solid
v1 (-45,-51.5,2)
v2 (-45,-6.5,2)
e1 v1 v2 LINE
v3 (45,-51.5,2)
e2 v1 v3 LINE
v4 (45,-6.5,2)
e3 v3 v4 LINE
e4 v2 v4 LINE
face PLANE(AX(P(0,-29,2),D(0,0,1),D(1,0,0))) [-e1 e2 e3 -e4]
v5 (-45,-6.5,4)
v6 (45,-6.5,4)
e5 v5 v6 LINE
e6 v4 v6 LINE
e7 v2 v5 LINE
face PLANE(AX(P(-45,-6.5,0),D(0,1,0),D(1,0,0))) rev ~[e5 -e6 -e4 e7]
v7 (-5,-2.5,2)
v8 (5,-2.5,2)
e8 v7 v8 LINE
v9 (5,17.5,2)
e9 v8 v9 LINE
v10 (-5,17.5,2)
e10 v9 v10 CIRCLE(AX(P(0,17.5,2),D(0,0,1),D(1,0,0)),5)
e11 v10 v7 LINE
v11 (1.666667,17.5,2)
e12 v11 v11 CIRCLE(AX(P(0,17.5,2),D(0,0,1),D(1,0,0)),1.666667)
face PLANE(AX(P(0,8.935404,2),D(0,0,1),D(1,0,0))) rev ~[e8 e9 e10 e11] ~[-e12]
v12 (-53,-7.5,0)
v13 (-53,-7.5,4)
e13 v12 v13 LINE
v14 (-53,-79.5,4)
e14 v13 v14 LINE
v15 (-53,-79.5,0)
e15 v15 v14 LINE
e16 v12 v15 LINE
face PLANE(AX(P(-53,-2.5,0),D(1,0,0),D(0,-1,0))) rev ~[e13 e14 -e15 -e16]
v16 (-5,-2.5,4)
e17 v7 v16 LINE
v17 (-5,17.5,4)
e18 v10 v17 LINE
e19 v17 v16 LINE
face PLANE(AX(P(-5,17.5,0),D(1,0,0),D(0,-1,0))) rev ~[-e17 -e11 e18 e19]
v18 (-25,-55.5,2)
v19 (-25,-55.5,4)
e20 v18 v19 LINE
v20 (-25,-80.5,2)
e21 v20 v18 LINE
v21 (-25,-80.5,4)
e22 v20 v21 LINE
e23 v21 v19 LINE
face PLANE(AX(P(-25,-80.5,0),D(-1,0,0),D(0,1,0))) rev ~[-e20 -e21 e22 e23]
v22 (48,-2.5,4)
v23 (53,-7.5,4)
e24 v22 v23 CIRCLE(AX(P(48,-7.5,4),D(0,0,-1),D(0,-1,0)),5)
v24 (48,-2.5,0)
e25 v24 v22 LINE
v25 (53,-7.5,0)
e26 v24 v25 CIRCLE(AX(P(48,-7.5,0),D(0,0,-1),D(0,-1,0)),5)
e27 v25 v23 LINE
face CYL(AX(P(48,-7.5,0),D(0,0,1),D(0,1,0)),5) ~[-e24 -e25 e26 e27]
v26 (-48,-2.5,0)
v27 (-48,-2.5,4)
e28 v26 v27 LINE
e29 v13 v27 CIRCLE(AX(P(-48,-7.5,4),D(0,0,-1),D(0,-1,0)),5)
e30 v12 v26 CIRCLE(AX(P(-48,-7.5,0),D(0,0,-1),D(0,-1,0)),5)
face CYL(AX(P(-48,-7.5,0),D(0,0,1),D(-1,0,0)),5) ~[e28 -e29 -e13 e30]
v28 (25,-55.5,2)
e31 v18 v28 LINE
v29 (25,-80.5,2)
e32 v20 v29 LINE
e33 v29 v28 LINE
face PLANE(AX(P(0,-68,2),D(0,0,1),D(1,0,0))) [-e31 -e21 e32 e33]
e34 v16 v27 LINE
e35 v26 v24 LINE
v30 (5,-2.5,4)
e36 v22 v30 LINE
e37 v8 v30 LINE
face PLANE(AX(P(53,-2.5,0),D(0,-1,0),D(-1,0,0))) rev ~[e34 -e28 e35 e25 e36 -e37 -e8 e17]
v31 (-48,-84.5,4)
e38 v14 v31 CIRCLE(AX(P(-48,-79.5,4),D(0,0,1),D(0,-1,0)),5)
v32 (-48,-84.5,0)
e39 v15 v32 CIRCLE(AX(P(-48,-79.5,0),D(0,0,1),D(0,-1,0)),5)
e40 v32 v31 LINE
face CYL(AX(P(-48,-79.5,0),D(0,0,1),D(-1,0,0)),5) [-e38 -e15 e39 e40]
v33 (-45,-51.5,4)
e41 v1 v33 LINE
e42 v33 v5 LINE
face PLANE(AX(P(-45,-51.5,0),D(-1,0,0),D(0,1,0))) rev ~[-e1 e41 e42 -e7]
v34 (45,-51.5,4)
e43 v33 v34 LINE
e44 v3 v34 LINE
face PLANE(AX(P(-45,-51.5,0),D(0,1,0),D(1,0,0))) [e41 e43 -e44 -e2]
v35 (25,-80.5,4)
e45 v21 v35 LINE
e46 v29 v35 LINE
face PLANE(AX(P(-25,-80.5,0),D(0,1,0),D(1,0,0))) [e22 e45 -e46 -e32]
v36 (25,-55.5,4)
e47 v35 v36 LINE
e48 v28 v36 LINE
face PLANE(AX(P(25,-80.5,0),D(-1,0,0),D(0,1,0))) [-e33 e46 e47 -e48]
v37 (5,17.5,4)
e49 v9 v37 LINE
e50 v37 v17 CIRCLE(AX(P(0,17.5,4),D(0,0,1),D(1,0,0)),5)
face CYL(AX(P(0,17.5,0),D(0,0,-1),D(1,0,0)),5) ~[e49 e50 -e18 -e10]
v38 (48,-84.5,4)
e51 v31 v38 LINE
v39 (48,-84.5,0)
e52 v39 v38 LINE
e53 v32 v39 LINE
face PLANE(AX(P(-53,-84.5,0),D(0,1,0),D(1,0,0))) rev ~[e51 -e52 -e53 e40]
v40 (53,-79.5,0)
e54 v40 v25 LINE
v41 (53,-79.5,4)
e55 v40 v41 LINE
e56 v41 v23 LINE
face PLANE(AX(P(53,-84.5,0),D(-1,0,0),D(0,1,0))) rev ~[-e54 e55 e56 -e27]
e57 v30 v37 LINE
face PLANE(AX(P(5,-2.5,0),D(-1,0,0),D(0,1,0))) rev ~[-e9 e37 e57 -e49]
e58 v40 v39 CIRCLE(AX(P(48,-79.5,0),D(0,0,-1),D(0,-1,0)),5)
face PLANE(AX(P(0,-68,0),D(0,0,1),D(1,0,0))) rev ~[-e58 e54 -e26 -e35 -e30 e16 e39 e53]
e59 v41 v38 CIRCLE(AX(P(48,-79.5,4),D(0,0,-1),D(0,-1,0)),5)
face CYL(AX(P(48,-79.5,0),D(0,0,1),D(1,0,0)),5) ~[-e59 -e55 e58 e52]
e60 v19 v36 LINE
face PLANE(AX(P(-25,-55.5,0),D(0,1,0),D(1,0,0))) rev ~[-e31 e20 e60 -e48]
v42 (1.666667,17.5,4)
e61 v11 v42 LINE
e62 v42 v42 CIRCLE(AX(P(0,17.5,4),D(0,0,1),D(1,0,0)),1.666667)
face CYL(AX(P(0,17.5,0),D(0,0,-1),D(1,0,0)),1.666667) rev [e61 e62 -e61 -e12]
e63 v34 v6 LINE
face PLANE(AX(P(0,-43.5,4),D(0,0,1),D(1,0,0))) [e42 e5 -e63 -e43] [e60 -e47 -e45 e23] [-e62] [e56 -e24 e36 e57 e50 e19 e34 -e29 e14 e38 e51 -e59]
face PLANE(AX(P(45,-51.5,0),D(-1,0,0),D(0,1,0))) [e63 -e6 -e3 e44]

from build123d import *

# Parameters (mm, degrees)
F0_W     = 50
F0_H     = 25
F0_W_2   = 90
F0_H_2   = 45
F1_DEPTH = 4
F2_DEPTH = 2
F5_DEPTH = 2.001
F7_R     = 5
F0_R     = 1.6666666667
F8_DEPTH = 4
F9_DEPTH = 2


# Not quite as in the source:
# - a feature names something its author has since deleted; it is built from what else it names


with BuildPart() as f1:
    # F0 (on Top) → F1 (new body)
    with BuildSketch(Plane.XY):
        Polygon((-53, -84.5), (53, -84.5), (53, -2.5), (5, -2.5), (-5, -2.5), (-53, -2.5), align=None)
        with Locations((0, -68)):
            Rectangle(F0_W, F0_H, mode=Mode.SUBTRACT)
        with Locations((0, -29)):
            Rectangle(F0_W_2, F0_H_2, mode=Mode.SUBTRACT)
    extrude(amount=F1_DEPTH)

    # F0 (on Top) → F2 (join)
    with BuildSketch(Plane.XY):
        with Locations((0, -68)):
            Rectangle(F0_W, F0_H)
        with Locations((0, -29)):
            Rectangle(F0_W_2, F0_H_2)
    extrude(amount=F2_DEPTH)

    # F4 (on offset) → F5 (cut, through all)
    with BuildSketch(Plane.XY.offset(2)):
        with BuildLine():
            Line((-4.1848091993, 17.7334633669), (-4.1848091993, 13.1759698881))
            ThreePointArc((-4.1848091993, 13.1759698881), (-0.249754072, 9.1237647174), (5, 11.2082569299))
            Line((5, 11.2082569299), (5, 17.5))
            ThreePointArc((5, 17.5), (3.3860967443, 17.9195789218), (1.7383729014, 18.1759698881))
            Line((1.7383729014, 18.1759698881), (-1.7383729014, 18.1759698881))
            ThreePointArc((-1.7383729014, 18.1759698881), (-2.9698441971, 18.0003448764), (-4.1848091993, 17.7334633669))
        make_face()
        with BuildLine():
            ThreePointArc((5, 11.2082569299), (-0.249754072, 9.1237647174), (-4.1848091993, 13.1759698881))
            Line((-4.1848091993, 13.1759698881), (-4.1848091993, 17.7334633669))
            ThreePointArc((-4.1848091993, 17.7334633669), (-12.2142757372, 12.9486427976), (-16.4107558429, 4.5966133744))
            Line((-16.4107558429, 4.5966133744), (-5, -2.5))
            Line((-5, -2.5), (5, -2.5))
            Line((5, -2.5), (5, 11.2082569299))
        make_face()
    extrude(amount=-F5_DEPTH, mode=Mode.SUBTRACT)

    # F7
    f7_edges = [f1.edges().sort_by_distance(p)[0] for p in [
        (53, -84.5, 2),
        (-53, -84.5, 2),
        (-53, -2.5, 2),
        (53, -2.5, 2),
    ]]
    fillet(f7_edges, radius=F7_R)

    # F0 (on Top) → F8 (join)
    with BuildSketch(Plane.XY):
        with BuildLine():
            Line((-5, -2.5), (5, -2.5))
            Line((5, -2.5), (5, 17.5))
            ThreePointArc((5, 17.5), (0, 22.5), (-5, 17.5))
            Line((-5, 17.5), (-5, -2.5))
        make_face()
        with Locations((0, 17.5)):
            Circle(F0_R, mode=Mode.SUBTRACT)
    extrude(amount=F8_DEPTH)

    # F0 (on Top) → F9 (cut)
    with BuildSketch(Plane.XY):
        with BuildLine():
            Line((-5, -2.5), (5, -2.5))
            Line((5, -2.5), (5, 17.5))
            ThreePointArc((5, 17.5), (0, 22.5), (-5, 17.5))
            Line((-5, 17.5), (-5, -2.5))
        make_face()
        with Locations((0, 17.5)):
            Circle(F0_R, mode=Mode.SUBTRACT)
    extrude(amount=F9_DEPTH, mode=Mode.SUBTRACT)


solid = f1.part
